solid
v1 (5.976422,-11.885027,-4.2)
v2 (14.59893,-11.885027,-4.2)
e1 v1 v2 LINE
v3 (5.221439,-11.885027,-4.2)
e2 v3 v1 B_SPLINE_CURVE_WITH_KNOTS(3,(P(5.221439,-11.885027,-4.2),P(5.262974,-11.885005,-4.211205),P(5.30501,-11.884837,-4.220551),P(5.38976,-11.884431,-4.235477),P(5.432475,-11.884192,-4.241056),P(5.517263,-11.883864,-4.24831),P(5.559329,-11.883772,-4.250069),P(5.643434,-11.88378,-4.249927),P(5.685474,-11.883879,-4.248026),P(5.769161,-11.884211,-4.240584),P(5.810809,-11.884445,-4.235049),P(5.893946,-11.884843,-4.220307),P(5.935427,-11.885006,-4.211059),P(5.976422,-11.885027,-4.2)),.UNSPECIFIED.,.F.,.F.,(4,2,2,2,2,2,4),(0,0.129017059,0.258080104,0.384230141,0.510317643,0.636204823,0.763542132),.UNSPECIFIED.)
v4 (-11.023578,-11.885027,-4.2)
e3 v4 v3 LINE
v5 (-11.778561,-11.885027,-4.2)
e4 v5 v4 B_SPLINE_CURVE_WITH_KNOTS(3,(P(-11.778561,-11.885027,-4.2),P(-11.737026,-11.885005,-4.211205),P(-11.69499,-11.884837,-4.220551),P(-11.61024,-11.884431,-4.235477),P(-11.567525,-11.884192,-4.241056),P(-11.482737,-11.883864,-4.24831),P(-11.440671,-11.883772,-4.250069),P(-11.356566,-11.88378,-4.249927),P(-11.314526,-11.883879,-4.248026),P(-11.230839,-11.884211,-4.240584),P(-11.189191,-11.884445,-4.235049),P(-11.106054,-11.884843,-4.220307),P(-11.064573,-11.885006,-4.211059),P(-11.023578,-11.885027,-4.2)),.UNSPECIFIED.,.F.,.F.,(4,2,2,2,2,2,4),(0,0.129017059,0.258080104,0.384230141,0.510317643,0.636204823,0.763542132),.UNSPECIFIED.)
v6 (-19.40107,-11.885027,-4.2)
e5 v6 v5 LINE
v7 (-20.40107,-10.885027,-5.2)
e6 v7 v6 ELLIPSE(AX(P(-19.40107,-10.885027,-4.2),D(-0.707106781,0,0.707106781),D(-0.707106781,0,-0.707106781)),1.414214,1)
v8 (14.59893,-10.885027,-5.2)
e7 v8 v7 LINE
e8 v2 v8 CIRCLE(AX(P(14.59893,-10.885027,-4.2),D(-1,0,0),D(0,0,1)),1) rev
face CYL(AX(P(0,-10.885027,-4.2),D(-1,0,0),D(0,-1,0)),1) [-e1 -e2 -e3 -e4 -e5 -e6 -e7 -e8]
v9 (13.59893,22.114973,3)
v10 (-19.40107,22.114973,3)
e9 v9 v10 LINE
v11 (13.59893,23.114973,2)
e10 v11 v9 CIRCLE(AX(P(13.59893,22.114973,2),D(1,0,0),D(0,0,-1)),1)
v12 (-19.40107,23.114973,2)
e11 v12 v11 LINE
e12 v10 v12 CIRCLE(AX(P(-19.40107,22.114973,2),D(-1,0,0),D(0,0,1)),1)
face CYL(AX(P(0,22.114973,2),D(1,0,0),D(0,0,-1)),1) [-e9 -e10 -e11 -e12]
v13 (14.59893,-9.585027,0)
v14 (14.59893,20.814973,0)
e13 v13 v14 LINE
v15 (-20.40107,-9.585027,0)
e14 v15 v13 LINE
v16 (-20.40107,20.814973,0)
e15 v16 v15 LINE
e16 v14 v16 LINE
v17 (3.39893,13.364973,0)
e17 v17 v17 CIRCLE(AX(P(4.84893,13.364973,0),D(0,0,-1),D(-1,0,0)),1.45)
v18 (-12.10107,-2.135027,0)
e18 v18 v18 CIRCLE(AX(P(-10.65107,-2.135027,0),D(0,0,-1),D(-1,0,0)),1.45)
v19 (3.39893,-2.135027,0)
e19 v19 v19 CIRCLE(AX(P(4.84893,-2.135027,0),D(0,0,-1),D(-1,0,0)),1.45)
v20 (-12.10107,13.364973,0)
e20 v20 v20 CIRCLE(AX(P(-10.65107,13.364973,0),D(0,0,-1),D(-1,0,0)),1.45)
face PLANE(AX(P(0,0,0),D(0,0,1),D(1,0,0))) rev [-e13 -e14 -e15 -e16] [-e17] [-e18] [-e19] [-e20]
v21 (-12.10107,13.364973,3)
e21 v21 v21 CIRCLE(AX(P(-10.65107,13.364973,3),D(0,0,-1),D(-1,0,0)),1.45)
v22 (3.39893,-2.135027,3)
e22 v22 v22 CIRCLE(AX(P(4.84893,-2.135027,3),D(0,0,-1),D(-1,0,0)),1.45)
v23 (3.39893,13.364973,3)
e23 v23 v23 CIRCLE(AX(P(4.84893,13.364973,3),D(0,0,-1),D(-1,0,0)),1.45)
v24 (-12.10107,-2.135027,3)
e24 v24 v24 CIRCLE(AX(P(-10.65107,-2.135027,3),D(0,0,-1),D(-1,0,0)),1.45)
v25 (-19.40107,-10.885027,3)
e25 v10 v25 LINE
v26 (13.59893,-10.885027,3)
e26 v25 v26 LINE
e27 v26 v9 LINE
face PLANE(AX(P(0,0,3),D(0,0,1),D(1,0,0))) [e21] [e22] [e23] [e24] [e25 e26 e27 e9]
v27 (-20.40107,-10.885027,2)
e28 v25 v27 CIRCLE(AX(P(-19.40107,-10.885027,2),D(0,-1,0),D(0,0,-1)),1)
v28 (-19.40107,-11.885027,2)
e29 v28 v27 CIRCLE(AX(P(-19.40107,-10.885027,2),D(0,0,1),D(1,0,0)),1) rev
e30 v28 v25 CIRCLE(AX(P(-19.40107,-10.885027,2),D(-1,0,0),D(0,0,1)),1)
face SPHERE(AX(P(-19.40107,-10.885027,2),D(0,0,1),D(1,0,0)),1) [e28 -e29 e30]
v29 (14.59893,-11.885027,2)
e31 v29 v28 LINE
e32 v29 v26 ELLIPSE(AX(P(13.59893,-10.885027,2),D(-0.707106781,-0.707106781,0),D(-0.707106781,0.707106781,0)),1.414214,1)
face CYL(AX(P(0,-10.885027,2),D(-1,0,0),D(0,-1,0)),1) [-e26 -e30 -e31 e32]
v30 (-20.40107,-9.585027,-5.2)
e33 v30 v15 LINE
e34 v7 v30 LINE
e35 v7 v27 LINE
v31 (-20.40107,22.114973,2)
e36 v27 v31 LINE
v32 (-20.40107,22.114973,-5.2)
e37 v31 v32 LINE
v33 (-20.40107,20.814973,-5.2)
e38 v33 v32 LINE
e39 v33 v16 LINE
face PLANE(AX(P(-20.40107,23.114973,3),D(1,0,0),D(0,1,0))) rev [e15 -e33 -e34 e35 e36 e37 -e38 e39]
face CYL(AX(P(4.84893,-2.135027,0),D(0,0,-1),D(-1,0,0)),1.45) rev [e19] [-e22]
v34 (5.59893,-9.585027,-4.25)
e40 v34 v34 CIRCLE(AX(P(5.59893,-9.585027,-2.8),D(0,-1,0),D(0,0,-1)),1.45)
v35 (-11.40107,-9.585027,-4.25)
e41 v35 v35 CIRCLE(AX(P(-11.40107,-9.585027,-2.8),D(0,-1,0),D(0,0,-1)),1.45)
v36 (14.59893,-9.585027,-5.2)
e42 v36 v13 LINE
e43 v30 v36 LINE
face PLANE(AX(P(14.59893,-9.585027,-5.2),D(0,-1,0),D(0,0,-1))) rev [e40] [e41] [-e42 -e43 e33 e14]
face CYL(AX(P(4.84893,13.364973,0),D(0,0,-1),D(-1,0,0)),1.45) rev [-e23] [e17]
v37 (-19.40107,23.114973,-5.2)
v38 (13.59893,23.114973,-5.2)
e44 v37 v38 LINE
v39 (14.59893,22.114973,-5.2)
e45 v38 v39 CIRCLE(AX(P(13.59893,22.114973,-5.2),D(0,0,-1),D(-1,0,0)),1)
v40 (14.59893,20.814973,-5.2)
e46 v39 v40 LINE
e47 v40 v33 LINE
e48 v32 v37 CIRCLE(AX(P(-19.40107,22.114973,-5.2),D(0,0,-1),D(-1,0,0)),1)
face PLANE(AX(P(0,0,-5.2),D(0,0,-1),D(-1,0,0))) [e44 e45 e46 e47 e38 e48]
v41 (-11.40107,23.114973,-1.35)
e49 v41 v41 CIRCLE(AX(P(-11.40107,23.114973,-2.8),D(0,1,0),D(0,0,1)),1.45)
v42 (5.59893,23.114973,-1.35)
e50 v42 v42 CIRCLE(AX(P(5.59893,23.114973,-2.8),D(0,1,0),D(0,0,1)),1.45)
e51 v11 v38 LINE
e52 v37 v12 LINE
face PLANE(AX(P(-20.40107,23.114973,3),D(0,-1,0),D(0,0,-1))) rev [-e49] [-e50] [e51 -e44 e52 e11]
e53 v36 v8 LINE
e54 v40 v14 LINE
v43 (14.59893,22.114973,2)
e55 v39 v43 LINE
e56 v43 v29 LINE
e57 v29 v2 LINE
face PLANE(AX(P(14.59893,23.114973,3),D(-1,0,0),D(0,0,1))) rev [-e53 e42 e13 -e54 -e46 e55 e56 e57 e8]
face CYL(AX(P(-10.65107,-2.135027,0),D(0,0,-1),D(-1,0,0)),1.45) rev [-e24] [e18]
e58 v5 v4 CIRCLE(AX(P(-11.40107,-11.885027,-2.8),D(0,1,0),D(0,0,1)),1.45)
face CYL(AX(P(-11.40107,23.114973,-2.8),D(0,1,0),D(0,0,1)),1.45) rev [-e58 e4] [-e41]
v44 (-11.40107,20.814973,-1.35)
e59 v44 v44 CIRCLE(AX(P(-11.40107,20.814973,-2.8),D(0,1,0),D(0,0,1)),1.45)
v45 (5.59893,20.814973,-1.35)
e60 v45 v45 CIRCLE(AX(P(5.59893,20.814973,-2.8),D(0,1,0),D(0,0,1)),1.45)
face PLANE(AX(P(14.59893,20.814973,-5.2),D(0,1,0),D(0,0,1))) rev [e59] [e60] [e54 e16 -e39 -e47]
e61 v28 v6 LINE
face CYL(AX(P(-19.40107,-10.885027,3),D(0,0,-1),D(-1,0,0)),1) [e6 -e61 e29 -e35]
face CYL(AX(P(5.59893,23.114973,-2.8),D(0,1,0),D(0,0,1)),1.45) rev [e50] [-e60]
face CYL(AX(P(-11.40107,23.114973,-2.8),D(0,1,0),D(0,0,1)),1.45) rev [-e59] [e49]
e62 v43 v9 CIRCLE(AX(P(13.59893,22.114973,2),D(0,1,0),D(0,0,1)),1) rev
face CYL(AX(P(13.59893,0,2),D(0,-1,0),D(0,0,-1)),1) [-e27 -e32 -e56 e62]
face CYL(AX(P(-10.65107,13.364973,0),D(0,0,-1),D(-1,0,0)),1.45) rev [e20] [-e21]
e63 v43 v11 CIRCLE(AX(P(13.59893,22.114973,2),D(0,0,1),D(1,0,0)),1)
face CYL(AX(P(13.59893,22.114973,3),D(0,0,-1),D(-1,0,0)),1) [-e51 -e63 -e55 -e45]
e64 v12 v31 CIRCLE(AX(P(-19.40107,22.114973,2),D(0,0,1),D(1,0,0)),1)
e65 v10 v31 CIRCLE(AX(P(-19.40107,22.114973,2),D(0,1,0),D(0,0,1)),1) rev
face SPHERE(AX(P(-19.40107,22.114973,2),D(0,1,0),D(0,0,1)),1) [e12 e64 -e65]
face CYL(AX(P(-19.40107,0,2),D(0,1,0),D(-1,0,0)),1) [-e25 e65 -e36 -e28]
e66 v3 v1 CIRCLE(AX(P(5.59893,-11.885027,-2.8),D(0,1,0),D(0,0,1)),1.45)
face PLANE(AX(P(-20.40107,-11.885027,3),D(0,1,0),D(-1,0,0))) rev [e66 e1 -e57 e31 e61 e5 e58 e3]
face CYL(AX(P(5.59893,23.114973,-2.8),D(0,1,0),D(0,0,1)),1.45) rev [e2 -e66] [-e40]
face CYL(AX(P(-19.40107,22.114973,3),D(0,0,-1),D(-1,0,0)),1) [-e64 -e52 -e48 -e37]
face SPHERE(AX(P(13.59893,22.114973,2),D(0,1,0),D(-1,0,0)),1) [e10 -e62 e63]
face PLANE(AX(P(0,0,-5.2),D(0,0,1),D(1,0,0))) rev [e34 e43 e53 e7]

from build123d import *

# Parameters (mm, degrees)
ESQUISSE1_W             = 35
ESQUISSE1_H             = 35
BOSS_EXTRU_1_DEPTH      = 3
ESQUISSE2_W             = 35
ESQUISSE2_H             = 2.3
BOSS_EXTRU_2_DEPTH      = 5.2
ESQUISSE3_R             = 1.25
ENL_V_MAT_EXTRU_1_DEPTH = 45
D_GAGEMENT_M2_51_D      = 2.9
D_GAGEMENT_M2_52_D      = 2.9
D_GAGEMENT_M2_53_D      = 2.9
CONG_1_R                = 1


with BuildPart() as part:
    # Esquisse1 → Boss.-Extru.1 (new body)
    with BuildSketch(Plane.XY):
        with Locations((-2.901069519, 5.614973262)):
            Rectangle(ESQUISSE1_W, ESQUISSE1_H)
    extrude(amount=BOSS_EXTRU_1_DEPTH)

    # Esquisse2 → Boss.-Extru.2 (add)
    with BuildSketch(Plane(origin=(0, 0, 0), x_dir=(-1, 0, 0), z_dir=(0, 0, -1))):
        with Locations((2.901069519, 21.964973262)):
            Rectangle(ESQUISSE2_W, ESQUISSE2_H)
        with Locations((2.901069519, -10.735026738)):
            Rectangle(ESQUISSE2_W, ESQUISSE2_H)
    extrude(amount=BOSS_EXTRU_2_DEPTH)

    # Esquisse3 → Enlèv. mat.-Extru.1 (cut)
    with BuildSketch(Plane(origin=(0, 23.114973262, 0), x_dir=(1, 0, 0), z_dir=(0, 1, 0))):
        with Locations(Location((-11.401069519, 2.8, 0), (0, 0, 270))):
            Circle(ESQUISSE3_R)
        with Locations(Location((5.598930481, 2.8, 0), (0, 0, 270))):
            Circle(ESQUISSE3_R)
    extrude(amount=-ENL_V_MAT_EXTRU_1_DEPTH, mode=Mode.SUBTRACT)

    # Dégagement M2.51 (through all)
    with Locations(Plane(origin=(0, 23.114973262, 0), x_dir=(1, 0, 0), z_dir=(0, 1, 0))):
        with Locations((-11.401069519, 2.8), (5.598930481, 2.8)):
            Hole(D_GAGEMENT_M2_51_D / 2)

    # Dégagement M2.52 (through all)
    with Locations(Plane(origin=(0, -11.885026738, 0), x_dir=(-1, 0, 0), z_dir=(0, -1, 0))):
        with Locations((11.401069519, 2.8), (-5.598930481, 2.8)):
            Hole(D_GAGEMENT_M2_52_D / 2)

    # Dégagement M2.53 (through all)
    with Locations(Plane(origin=(0, 0, 0), x_dir=(-1, 0, 0), z_dir=(0, 0, -1))):
        with Locations((-4.848930481, 13.364973262), (10.651069519, 13.364973262), (10.651069519, -2.135026738), (-4.848930481, -2.135026738)):
            Hole(D_GAGEMENT_M2_53_D / 2)

    # Congé1
    # the kernel refuses this fillet: 1 mm, written as the material it takes off along each edge
    with BuildSketch(Plane(origin=(13.598930481, 22.114973262, 2), x_dir=(0, 0, 1), z_dir=(0, 1, 0))) as cong_1_piece_1_section:
        Polygon((0, 0), (CONG_1_R, 0), (CONG_1_R, CONG_1_R), (0, CONG_1_R), align=None)
    cong_1_piece_1 = extrude(amount=CONG_1_R, mode=Mode.PRIVATE)
    cong_1_piece_1 = cong_1_piece_1 - Plane(origin=(13.598930481, 22.114973262, 2), x_dir=(-0.7071067811865475, 0, -0.7071067811865475), z_dir=(0, 1, 0)) * Sphere(CONG_1_R, mode=Mode.PRIVATE)
    add(cong_1_piece_1, mode=Mode.SUBTRACT)
    with BuildSketch(Plane(origin=(-19.401069519, 22.114973262, 2), x_dir=(0, 0, 1), z_dir=(0, 1, 0))) as cong_1_piece_2_section:
        Polygon((0, 0), (CONG_1_R, 0), (CONG_1_R, -CONG_1_R), (0, -CONG_1_R), align=None)
    cong_1_piece_2 = extrude(amount=CONG_1_R, mode=Mode.PRIVATE)
    cong_1_piece_2 = cong_1_piece_2 - Plane(origin=(-19.401069519, 22.114973262, 2), x_dir=(0.7071067811865475, 0, -0.7071067811865475), z_dir=(0, 1, 0)) * Sphere(CONG_1_R, mode=Mode.PRIVATE)
    add(cong_1_piece_2, mode=Mode.SUBTRACT)
    with BuildSketch(Plane(origin=(-19.401069519, -10.885026738, 2), x_dir=(-1, 0, 0), z_dir=(0, 0, 1))) as cong_1_piece_3_section:
        Polygon((0, 0), (CONG_1_R, 0), (CONG_1_R, CONG_1_R), (0, CONG_1_R), align=None)
    cong_1_piece_3 = extrude(amount=CONG_1_R, mode=Mode.PRIVATE)
    cong_1_piece_3 = cong_1_piece_3 - Plane(origin=(-19.401069519, -10.885026738, 2), x_dir=(0.7071067811865475, 0.7071067811865477, 0), z_dir=(0, 0, 1)) * Sphere(CONG_1_R, mode=Mode.PRIVATE)
    add(cong_1_piece_3, mode=Mode.SUBTRACT)
    with BuildSketch(Plane(origin=(14.598930481, 22.114973262, 3), x_dir=(-1, 0, 0), z_dir=(0, -1, 0)), Plane(origin=(17.098930481, -11.885026738, 3), x_dir=(0, 1, 0), z_dir=(-1, 0, 0))) as cong_1_piece_4:
        with BuildLine():
            CenterArc((CONG_1_R, CONG_1_R), CONG_1_R, 180, 90)
            Line((0, CONG_1_R), (0, 0))
            Line((0, 0), (CONG_1_R, 0))
        make_face()
    extrude(amount=36.5, mode=Mode.SUBTRACT)
    with BuildSketch(Plane(origin=(-19.401069519, 23.114973262, 3), x_dir=(0, 0, -1), z_dir=(1, 0, 0))) as cong_1_piece_5:
        with BuildLine():
            CenterArc((CONG_1_R, -CONG_1_R), CONG_1_R, 90, 90)
            Line((0, -CONG_1_R), (0, 0))
            Line((0, 0), (CONG_1_R, 0))
        make_face()
    extrude(amount=33, mode=Mode.SUBTRACT)
    with BuildSketch(Plane(origin=(17.098930481, -11.885026738, -5.2), x_dir=(0, 0, 1), z_dir=(-1, 0, 0))) as cong_1_piece_6:
        with BuildLine():
            CenterArc((CONG_1_R, CONG_1_R), CONG_1_R, 180, 90)
            Line((0, CONG_1_R), (0, 0))
            Line((0, 0), (CONG_1_R, 0))
        make_face()
    extrude(amount=40, mode=Mode.SUBTRACT)
    with BuildSketch(Plane(origin=(-20.401069519, -10.885026738, 3), x_dir=(1, 0, 0), z_dir=(0, 1, 0))) as cong_1_piece_7:
        with BuildLine():
            CenterArc((CONG_1_R, CONG_1_R), CONG_1_R, 180, 90)
            Line((0, CONG_1_R), (0, 0))
            Line((0, 0), (CONG_1_R, 0))
        make_face()
    extrude(amount=33, mode=Mode.SUBTRACT)
    with BuildSketch(Plane(origin=(-20.401069519, 23.114973262, -7.7), x_dir=(1, 0, 0), z_dir=(0, 0, 1)), Plane(origin=(14.598930481, 23.114973262, 2), x_dir=(-1, 0, 0), z_dir=(0, 0, -1)), Plane(origin=(-20.401069519, -11.885026738, -7.7), x_dir=(0, 1, 0), z_dir=(0, 0, 1))) as cong_1_piece_8:
        with BuildLine():
            CenterArc((CONG_1_R, -CONG_1_R), CONG_1_R, 90, 90)
            Line((0, -CONG_1_R), (0, 0))
            Line((0, 0), (CONG_1_R, 0))
        make_face()
    extrude(amount=9.7, mode=Mode.SUBTRACT)


solid = part.part
